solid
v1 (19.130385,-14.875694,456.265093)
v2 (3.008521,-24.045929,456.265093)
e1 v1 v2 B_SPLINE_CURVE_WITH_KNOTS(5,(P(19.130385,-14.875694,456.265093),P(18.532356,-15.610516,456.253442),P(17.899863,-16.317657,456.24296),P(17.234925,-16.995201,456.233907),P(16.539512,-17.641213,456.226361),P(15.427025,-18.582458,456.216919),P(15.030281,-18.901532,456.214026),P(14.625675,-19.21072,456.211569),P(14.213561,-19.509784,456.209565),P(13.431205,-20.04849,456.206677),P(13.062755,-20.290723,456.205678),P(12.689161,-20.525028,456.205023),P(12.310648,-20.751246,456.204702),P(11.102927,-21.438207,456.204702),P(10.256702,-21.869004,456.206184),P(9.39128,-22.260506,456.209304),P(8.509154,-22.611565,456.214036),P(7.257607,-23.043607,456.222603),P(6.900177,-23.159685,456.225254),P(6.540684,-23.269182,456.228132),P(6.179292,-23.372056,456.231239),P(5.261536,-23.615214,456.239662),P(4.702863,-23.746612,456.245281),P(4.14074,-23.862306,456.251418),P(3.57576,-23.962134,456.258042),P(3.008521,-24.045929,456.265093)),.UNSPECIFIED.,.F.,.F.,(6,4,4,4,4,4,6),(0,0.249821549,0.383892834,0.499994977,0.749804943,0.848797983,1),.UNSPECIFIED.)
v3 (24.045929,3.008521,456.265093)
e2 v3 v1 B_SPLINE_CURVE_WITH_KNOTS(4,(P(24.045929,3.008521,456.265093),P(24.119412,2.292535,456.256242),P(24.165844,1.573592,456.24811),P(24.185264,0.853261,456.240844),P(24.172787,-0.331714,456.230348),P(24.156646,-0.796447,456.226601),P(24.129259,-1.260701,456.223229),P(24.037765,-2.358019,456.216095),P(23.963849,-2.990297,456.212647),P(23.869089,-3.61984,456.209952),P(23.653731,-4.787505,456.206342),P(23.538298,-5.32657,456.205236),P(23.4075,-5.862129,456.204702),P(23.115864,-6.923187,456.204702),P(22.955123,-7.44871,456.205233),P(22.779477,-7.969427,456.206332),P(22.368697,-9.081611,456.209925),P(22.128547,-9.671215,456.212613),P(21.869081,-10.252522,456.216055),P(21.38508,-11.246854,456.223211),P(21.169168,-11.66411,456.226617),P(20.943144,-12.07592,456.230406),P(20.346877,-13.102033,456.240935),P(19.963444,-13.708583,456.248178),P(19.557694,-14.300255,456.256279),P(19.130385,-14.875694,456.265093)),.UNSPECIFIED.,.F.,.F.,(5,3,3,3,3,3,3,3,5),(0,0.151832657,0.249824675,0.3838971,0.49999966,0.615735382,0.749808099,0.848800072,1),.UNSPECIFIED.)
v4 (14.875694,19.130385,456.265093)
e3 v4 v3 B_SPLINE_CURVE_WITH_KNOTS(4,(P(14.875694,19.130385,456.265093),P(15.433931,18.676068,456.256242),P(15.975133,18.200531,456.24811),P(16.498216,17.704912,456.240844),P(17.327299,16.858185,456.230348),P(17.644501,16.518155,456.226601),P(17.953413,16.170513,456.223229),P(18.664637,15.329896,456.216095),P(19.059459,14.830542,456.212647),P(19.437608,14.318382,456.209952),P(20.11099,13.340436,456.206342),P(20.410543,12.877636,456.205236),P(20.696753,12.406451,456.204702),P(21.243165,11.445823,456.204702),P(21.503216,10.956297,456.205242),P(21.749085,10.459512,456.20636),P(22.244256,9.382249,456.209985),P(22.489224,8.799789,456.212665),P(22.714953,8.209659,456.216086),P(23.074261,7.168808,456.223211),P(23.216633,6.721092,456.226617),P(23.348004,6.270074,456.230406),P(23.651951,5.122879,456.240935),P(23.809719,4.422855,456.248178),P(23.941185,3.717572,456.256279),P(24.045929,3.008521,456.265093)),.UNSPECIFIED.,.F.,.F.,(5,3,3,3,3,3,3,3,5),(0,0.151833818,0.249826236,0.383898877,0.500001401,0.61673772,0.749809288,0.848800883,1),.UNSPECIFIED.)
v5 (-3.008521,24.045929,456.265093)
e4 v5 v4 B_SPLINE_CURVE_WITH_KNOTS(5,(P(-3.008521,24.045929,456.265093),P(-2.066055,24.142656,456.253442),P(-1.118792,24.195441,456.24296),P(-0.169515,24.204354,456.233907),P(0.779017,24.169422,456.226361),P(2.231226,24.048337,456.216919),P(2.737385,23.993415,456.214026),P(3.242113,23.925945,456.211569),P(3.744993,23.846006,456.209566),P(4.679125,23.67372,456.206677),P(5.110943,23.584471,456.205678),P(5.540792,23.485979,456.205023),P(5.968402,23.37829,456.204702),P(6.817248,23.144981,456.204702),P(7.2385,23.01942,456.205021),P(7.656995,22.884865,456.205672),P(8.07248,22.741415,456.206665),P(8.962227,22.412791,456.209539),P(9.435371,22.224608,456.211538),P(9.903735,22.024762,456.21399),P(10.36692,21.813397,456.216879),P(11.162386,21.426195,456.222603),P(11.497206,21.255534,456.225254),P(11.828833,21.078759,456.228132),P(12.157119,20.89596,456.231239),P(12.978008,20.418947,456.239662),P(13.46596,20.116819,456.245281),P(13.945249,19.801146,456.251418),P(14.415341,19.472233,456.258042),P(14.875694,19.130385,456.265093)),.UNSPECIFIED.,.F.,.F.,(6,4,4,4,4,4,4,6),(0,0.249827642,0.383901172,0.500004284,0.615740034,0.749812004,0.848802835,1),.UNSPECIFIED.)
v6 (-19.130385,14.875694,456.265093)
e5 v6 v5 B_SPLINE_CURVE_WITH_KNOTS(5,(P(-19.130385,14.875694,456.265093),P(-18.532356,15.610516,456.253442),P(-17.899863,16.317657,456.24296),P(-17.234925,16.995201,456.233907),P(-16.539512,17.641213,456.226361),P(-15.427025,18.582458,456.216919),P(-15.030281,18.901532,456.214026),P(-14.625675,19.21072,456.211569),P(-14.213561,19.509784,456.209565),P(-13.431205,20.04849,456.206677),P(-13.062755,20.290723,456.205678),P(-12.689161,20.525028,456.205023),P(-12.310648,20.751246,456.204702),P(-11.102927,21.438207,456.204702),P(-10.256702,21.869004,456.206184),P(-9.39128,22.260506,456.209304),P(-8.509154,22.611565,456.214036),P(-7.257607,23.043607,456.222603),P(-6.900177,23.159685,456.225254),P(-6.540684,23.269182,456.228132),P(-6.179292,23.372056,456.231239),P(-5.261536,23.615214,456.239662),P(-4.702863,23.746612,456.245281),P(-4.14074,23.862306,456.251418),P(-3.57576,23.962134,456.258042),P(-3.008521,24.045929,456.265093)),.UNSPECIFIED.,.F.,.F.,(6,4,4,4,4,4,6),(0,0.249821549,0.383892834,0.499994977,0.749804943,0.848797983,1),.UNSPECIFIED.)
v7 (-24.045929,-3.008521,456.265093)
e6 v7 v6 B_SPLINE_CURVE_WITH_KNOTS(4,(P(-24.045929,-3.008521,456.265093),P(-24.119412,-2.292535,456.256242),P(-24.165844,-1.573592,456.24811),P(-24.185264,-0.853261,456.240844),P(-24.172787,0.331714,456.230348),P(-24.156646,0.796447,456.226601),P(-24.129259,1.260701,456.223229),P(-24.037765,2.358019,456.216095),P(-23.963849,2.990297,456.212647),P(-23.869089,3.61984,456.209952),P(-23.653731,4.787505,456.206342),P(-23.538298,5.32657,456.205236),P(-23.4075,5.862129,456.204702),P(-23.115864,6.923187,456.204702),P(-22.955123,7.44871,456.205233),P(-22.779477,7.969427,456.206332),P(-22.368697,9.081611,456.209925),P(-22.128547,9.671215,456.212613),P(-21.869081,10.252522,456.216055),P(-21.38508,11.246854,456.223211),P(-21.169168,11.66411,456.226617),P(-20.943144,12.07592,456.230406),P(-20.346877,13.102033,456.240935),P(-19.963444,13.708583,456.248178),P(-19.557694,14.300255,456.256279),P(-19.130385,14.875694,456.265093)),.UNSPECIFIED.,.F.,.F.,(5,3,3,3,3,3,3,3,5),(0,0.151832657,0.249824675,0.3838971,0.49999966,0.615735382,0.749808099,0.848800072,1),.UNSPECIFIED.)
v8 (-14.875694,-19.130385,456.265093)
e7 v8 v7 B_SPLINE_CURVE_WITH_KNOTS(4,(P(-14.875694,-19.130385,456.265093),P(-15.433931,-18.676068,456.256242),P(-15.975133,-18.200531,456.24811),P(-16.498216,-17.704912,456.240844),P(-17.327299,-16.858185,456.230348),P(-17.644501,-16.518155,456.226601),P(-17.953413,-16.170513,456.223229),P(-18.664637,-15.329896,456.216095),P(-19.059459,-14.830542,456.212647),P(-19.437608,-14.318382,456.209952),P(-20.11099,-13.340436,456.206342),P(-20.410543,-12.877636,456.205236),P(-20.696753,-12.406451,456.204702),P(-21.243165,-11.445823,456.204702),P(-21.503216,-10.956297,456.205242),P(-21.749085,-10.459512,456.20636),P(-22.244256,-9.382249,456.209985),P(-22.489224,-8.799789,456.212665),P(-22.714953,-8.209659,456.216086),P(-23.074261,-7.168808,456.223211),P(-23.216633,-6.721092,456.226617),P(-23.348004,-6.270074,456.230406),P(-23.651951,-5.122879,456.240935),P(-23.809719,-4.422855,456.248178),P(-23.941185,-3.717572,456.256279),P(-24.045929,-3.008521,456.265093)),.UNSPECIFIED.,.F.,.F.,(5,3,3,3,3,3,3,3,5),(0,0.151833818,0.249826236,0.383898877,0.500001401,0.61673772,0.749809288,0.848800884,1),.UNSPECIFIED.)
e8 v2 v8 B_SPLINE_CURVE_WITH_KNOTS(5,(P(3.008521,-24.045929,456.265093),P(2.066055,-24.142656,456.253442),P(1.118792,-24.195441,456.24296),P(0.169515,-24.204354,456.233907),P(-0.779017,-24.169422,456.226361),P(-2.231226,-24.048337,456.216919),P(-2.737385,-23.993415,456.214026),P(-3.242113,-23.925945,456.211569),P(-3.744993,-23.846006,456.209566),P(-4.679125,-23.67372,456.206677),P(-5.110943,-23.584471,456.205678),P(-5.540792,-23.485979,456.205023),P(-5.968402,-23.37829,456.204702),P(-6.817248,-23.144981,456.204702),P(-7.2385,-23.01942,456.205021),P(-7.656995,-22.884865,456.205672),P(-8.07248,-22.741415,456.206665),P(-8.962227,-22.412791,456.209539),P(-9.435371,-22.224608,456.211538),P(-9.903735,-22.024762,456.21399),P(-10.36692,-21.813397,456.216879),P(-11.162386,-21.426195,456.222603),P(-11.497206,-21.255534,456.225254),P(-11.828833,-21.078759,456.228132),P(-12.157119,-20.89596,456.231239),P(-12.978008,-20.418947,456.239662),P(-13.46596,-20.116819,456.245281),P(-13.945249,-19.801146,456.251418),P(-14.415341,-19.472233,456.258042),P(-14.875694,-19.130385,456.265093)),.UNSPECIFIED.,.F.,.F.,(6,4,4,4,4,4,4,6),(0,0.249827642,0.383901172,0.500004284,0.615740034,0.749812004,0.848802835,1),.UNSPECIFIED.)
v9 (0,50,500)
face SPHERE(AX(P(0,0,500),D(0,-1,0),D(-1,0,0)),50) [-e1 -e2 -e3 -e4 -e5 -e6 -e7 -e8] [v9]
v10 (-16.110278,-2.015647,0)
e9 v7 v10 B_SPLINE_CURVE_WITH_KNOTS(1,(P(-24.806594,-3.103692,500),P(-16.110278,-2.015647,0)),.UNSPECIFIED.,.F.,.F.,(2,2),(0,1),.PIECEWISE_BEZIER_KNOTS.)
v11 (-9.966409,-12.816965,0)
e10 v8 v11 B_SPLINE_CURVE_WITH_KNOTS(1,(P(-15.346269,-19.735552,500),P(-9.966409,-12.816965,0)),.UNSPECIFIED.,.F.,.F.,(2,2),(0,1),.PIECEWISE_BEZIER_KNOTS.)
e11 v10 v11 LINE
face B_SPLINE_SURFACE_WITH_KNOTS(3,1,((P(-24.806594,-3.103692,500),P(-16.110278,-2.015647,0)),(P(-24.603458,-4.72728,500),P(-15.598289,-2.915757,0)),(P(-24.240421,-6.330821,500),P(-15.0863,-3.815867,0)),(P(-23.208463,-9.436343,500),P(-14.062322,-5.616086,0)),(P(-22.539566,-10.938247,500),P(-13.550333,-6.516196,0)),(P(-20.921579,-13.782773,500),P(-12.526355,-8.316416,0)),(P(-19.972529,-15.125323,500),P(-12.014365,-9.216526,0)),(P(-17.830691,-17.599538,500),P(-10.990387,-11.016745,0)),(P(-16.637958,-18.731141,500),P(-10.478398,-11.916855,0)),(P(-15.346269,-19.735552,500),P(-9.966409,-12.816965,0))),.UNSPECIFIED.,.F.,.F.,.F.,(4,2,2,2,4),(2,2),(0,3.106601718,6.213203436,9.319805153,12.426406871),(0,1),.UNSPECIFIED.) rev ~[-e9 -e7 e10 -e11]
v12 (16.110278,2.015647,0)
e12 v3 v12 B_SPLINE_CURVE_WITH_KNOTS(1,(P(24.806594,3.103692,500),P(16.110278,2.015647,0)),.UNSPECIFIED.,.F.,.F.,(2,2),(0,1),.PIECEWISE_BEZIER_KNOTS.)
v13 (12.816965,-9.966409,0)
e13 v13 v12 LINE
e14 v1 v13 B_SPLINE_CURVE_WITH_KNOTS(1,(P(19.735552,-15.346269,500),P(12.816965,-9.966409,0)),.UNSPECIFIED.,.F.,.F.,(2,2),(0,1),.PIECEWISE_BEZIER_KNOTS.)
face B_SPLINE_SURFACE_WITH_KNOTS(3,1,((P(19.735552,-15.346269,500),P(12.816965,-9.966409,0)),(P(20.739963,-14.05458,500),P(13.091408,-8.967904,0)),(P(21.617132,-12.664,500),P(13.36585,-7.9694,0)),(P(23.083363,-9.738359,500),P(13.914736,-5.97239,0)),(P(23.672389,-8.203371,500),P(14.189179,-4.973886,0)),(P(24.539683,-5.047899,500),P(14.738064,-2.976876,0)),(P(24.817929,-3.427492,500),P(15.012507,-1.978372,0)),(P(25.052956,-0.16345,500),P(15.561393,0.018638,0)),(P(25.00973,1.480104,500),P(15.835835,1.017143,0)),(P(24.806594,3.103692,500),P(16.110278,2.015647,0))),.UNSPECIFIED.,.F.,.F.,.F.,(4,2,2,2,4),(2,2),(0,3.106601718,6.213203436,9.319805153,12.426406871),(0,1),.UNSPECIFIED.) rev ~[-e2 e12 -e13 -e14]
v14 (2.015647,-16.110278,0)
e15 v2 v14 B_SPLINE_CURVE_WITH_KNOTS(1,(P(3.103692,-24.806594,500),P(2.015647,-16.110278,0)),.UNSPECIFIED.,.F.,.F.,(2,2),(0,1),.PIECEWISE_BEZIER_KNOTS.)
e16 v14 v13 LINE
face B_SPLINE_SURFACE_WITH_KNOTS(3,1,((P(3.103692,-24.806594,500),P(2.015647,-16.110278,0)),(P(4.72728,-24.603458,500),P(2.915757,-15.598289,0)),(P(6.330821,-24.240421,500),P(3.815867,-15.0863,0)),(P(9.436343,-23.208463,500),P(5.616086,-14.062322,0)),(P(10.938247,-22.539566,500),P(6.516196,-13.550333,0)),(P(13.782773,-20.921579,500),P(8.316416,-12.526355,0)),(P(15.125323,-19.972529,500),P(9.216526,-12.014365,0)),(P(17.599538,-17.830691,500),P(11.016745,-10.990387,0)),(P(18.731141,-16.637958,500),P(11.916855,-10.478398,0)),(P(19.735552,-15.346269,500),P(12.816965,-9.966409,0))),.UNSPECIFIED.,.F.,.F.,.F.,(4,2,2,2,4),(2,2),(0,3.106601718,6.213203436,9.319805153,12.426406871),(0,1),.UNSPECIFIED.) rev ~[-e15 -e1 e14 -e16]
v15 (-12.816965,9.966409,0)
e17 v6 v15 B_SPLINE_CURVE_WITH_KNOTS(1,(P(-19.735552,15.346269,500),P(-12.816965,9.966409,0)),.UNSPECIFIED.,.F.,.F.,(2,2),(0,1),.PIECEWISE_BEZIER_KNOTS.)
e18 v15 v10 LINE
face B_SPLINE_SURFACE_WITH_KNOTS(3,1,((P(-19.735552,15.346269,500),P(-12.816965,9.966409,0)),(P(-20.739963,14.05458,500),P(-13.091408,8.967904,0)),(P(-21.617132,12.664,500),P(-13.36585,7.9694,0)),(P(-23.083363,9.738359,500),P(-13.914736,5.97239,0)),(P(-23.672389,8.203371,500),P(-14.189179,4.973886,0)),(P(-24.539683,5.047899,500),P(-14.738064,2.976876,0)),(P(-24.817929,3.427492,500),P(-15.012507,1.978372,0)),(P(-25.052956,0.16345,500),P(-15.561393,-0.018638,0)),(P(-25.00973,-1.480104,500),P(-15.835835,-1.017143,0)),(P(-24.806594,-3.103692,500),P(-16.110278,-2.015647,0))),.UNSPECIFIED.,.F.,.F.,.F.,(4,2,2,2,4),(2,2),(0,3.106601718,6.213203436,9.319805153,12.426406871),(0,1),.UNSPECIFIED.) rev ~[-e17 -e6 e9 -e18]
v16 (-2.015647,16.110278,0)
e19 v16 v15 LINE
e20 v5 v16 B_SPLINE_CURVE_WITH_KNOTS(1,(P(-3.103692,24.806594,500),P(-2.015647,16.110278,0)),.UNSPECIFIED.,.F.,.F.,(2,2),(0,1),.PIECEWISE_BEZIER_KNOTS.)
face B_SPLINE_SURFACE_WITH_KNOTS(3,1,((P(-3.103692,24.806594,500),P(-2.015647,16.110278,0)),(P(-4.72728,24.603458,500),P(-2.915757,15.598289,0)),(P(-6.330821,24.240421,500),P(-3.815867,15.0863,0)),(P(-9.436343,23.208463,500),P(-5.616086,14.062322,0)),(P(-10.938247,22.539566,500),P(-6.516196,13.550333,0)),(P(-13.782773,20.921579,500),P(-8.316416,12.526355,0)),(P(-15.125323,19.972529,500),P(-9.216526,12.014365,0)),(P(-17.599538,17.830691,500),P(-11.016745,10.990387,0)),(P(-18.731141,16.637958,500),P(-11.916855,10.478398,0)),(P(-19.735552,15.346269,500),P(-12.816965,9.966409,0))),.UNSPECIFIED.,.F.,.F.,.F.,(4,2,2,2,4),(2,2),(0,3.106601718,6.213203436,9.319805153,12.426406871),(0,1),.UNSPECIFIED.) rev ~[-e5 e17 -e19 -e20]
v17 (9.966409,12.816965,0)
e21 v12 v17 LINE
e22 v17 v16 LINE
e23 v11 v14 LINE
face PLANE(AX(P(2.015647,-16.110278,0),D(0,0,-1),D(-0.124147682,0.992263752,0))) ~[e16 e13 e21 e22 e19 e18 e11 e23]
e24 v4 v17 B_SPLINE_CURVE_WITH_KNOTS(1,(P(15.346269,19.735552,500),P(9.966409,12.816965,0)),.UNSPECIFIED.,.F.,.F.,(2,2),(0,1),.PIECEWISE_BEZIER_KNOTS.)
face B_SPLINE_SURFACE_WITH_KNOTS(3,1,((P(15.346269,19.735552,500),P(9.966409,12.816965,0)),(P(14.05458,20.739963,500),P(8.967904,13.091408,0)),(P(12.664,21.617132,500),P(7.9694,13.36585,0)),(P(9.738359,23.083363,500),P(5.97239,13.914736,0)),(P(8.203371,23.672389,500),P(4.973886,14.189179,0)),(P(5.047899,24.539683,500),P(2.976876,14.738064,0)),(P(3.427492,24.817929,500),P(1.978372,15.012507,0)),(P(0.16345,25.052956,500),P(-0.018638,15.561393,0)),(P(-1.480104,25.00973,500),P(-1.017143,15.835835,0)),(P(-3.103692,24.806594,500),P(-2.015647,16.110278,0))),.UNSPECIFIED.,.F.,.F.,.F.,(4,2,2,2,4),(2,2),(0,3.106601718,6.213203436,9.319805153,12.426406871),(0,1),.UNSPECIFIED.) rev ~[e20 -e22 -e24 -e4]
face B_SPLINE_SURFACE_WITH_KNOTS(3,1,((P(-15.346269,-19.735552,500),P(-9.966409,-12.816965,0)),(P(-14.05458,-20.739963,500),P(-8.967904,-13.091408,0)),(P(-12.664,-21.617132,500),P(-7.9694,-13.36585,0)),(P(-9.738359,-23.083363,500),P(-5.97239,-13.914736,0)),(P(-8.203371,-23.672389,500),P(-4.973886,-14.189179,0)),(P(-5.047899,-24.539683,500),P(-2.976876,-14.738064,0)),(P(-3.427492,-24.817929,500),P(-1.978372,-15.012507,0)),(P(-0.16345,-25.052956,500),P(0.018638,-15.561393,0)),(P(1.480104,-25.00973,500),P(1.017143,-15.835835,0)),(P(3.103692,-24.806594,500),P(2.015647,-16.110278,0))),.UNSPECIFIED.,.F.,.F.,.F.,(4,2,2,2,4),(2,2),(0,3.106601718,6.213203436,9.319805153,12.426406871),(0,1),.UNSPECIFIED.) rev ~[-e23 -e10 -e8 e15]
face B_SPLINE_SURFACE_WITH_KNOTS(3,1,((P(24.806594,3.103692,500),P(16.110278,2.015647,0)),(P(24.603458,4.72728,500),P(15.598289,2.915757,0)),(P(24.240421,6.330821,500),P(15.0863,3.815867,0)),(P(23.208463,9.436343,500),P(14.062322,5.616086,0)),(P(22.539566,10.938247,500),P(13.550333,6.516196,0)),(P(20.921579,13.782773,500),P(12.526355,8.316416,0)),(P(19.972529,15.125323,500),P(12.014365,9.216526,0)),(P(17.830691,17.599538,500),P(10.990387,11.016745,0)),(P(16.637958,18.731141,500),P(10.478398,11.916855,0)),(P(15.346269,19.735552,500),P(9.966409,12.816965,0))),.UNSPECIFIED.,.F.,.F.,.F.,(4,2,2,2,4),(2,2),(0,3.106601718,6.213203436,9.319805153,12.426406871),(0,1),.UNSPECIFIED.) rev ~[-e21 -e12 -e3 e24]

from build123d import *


# Not quite as in the source:
# - the arcs of a loft's sections are written as splines that run evenly, so that the points pair up as in the source's solid


with BuildPart() as f3:
    # F2 (on offset) → F3 section 0
    with BuildSketch(Plane.XY.offset(500)):
        with BuildLine():
            add(Edge.make_bspline(
                [(3.1036920521, -24.8065937937), (4.7272798193, -24.6034576239), (6.3308207683, -24.2404209935), (9.4363429336, -23.2084625424), (10.9382473598, -22.5395662389), (13.782772681, -20.9215792608), (15.1253232396, -19.972528594), (17.5995382038, -17.8306914211), (18.7311414296, -16.6379578761), (19.7355523864, -15.3462689929)],
                knots=[0, 0, 0, 0, 0.25, 0.25, 0.5, 0.5, 0.75, 0.75, 1, 1, 1, 1], degree=3))
            add(Edge.make_bspline(
                [(19.7355523864, -15.3462689929), (20.7399633433, -14.0545801097), (21.617132359, -12.6639997676), (23.0833633226, -9.7383591666), (23.6723890149, -8.2033712501), (24.5396825947, -5.0478985421), (24.8179290366, -3.427491776), (25.0529556268, -0.1634500075), (25.0097299635, 1.480104285), (24.8065937937, 3.1036920521)],
                knots=[0, 0, 0, 0, 0.25, 0.25, 0.5, 0.5, 0.75, 0.75, 1, 1, 1, 1], degree=3))
            add(Edge.make_bspline(
                [(24.8065937937, 3.1036920521), (24.6034576239, 4.7272798193), (24.2404209935, 6.3308207683), (23.2084625424, 9.4363429336), (22.5395662389, 10.9382473598), (20.9215792608, 13.782772681), (19.972528594, 15.1253232396), (17.8306914211, 17.5995382038), (16.6379578761, 18.7311414296), (15.3462689929, 19.7355523864)],
                knots=[0, 0, 0, 0, 0.25, 0.25, 0.5, 0.5, 0.75, 0.75, 1, 1, 1, 1], degree=3))
            add(Edge.make_bspline(
                [(15.3462689929, 19.7355523864), (14.0545801097, 20.7399633433), (12.6639997676, 21.617132359), (9.7383591666, 23.0833633226), (8.2033712501, 23.6723890149), (5.0478985421, 24.5396825947), (3.427491776, 24.8179290366), (0.1634500075, 25.0529556268), (-1.480104285, 25.0097299635), (-3.1036920521, 24.8065937937)],
                knots=[0, 0, 0, 0, 0.25, 0.25, 0.5, 0.5, 0.75, 0.75, 1, 1, 1, 1], degree=3))
            add(Edge.make_bspline(
                [(-3.1036920521, 24.8065937937), (-4.7272798193, 24.6034576239), (-6.3308207683, 24.2404209935), (-9.4363429336, 23.2084625424), (-10.9382473598, 22.5395662389), (-13.782772681, 20.9215792608), (-15.1253232396, 19.972528594), (-17.5995382038, 17.8306914211), (-18.7311414296, 16.6379578761), (-19.7355523864, 15.3462689929)],
                knots=[0, 0, 0, 0, 0.25, 0.25, 0.5, 0.5, 0.75, 0.75, 1, 1, 1, 1], degree=3))
            add(Edge.make_bspline(
                [(-19.7355523864, 15.3462689929), (-20.7399633433, 14.0545801097), (-21.617132359, 12.6639997676), (-23.0833633226, 9.7383591666), (-23.6723890149, 8.2033712501), (-24.5396825947, 5.0478985421), (-24.8179290366, 3.427491776), (-25.0529556268, 0.1634500075), (-25.0097299635, -1.480104285), (-24.8065937937, -3.1036920521)],
                knots=[0, 0, 0, 0, 0.25, 0.25, 0.5, 0.5, 0.75, 0.75, 1, 1, 1, 1], degree=3))
            add(Edge.make_bspline(
                [(-24.8065937937, -3.1036920521), (-24.6034576239, -4.7272798193), (-24.2404209935, -6.3308207683), (-23.2084625424, -9.4363429336), (-22.5395662389, -10.9382473598), (-20.9215792608, -13.782772681), (-19.972528594, -15.1253232396), (-17.8306914211, -17.5995382038), (-16.6379578761, -18.7311414296), (-15.3462689929, -19.7355523864)],
                knots=[0, 0, 0, 0, 0.25, 0.25, 0.5, 0.5, 0.75, 0.75, 1, 1, 1, 1], degree=3))
            add(Edge.make_bspline(
                [(-15.3462689929, -19.7355523864), (-14.0545801097, -20.7399633433), (-12.6639997676, -21.617132359), (-9.7383591666, -23.0833633226), (-8.2033712501, -23.6723890149), (-5.0478985421, -24.5396825947), (-3.427491776, -24.8179290366), (-0.1634500075, -25.0529556268), (1.480104285, -25.0097299635), (3.1036920521, -24.8065937937)],
                knots=[0, 0, 0, 0, 0.25, 0.25, 0.5, 0.5, 0.75, 0.75, 1, 1, 1, 1], degree=3))
        make_face()
    # F1 (on Top) → F3 section 1
    with BuildSketch(Plane.XY):
        Polygon((2.0156472416, -16.1102781829), (12.8169647829, -9.9664091169), (16.1102781829, 2.0156472416), (9.9664091169, 12.8169647829), (-2.0156472416, 16.1102781829), (-12.8169647829, 9.9664091169), (-16.1102781829, -2.0156472416), (-9.9664091169, -12.8169647829), align=None)
    loft(ruled=True)

    # F5 (on offset) → F6 (revolve)
    with BuildSketch(Plane.XY.offset(500)):
        with BuildLine():
            Line((0, -50), (0, 50))
            ThreePointArc((0, 50), (-50, 0), (0, -50))
        make_face()
    revolve(axis=Axis((0, 0, 500), (0, -1, 0)))


solid = f3.part
